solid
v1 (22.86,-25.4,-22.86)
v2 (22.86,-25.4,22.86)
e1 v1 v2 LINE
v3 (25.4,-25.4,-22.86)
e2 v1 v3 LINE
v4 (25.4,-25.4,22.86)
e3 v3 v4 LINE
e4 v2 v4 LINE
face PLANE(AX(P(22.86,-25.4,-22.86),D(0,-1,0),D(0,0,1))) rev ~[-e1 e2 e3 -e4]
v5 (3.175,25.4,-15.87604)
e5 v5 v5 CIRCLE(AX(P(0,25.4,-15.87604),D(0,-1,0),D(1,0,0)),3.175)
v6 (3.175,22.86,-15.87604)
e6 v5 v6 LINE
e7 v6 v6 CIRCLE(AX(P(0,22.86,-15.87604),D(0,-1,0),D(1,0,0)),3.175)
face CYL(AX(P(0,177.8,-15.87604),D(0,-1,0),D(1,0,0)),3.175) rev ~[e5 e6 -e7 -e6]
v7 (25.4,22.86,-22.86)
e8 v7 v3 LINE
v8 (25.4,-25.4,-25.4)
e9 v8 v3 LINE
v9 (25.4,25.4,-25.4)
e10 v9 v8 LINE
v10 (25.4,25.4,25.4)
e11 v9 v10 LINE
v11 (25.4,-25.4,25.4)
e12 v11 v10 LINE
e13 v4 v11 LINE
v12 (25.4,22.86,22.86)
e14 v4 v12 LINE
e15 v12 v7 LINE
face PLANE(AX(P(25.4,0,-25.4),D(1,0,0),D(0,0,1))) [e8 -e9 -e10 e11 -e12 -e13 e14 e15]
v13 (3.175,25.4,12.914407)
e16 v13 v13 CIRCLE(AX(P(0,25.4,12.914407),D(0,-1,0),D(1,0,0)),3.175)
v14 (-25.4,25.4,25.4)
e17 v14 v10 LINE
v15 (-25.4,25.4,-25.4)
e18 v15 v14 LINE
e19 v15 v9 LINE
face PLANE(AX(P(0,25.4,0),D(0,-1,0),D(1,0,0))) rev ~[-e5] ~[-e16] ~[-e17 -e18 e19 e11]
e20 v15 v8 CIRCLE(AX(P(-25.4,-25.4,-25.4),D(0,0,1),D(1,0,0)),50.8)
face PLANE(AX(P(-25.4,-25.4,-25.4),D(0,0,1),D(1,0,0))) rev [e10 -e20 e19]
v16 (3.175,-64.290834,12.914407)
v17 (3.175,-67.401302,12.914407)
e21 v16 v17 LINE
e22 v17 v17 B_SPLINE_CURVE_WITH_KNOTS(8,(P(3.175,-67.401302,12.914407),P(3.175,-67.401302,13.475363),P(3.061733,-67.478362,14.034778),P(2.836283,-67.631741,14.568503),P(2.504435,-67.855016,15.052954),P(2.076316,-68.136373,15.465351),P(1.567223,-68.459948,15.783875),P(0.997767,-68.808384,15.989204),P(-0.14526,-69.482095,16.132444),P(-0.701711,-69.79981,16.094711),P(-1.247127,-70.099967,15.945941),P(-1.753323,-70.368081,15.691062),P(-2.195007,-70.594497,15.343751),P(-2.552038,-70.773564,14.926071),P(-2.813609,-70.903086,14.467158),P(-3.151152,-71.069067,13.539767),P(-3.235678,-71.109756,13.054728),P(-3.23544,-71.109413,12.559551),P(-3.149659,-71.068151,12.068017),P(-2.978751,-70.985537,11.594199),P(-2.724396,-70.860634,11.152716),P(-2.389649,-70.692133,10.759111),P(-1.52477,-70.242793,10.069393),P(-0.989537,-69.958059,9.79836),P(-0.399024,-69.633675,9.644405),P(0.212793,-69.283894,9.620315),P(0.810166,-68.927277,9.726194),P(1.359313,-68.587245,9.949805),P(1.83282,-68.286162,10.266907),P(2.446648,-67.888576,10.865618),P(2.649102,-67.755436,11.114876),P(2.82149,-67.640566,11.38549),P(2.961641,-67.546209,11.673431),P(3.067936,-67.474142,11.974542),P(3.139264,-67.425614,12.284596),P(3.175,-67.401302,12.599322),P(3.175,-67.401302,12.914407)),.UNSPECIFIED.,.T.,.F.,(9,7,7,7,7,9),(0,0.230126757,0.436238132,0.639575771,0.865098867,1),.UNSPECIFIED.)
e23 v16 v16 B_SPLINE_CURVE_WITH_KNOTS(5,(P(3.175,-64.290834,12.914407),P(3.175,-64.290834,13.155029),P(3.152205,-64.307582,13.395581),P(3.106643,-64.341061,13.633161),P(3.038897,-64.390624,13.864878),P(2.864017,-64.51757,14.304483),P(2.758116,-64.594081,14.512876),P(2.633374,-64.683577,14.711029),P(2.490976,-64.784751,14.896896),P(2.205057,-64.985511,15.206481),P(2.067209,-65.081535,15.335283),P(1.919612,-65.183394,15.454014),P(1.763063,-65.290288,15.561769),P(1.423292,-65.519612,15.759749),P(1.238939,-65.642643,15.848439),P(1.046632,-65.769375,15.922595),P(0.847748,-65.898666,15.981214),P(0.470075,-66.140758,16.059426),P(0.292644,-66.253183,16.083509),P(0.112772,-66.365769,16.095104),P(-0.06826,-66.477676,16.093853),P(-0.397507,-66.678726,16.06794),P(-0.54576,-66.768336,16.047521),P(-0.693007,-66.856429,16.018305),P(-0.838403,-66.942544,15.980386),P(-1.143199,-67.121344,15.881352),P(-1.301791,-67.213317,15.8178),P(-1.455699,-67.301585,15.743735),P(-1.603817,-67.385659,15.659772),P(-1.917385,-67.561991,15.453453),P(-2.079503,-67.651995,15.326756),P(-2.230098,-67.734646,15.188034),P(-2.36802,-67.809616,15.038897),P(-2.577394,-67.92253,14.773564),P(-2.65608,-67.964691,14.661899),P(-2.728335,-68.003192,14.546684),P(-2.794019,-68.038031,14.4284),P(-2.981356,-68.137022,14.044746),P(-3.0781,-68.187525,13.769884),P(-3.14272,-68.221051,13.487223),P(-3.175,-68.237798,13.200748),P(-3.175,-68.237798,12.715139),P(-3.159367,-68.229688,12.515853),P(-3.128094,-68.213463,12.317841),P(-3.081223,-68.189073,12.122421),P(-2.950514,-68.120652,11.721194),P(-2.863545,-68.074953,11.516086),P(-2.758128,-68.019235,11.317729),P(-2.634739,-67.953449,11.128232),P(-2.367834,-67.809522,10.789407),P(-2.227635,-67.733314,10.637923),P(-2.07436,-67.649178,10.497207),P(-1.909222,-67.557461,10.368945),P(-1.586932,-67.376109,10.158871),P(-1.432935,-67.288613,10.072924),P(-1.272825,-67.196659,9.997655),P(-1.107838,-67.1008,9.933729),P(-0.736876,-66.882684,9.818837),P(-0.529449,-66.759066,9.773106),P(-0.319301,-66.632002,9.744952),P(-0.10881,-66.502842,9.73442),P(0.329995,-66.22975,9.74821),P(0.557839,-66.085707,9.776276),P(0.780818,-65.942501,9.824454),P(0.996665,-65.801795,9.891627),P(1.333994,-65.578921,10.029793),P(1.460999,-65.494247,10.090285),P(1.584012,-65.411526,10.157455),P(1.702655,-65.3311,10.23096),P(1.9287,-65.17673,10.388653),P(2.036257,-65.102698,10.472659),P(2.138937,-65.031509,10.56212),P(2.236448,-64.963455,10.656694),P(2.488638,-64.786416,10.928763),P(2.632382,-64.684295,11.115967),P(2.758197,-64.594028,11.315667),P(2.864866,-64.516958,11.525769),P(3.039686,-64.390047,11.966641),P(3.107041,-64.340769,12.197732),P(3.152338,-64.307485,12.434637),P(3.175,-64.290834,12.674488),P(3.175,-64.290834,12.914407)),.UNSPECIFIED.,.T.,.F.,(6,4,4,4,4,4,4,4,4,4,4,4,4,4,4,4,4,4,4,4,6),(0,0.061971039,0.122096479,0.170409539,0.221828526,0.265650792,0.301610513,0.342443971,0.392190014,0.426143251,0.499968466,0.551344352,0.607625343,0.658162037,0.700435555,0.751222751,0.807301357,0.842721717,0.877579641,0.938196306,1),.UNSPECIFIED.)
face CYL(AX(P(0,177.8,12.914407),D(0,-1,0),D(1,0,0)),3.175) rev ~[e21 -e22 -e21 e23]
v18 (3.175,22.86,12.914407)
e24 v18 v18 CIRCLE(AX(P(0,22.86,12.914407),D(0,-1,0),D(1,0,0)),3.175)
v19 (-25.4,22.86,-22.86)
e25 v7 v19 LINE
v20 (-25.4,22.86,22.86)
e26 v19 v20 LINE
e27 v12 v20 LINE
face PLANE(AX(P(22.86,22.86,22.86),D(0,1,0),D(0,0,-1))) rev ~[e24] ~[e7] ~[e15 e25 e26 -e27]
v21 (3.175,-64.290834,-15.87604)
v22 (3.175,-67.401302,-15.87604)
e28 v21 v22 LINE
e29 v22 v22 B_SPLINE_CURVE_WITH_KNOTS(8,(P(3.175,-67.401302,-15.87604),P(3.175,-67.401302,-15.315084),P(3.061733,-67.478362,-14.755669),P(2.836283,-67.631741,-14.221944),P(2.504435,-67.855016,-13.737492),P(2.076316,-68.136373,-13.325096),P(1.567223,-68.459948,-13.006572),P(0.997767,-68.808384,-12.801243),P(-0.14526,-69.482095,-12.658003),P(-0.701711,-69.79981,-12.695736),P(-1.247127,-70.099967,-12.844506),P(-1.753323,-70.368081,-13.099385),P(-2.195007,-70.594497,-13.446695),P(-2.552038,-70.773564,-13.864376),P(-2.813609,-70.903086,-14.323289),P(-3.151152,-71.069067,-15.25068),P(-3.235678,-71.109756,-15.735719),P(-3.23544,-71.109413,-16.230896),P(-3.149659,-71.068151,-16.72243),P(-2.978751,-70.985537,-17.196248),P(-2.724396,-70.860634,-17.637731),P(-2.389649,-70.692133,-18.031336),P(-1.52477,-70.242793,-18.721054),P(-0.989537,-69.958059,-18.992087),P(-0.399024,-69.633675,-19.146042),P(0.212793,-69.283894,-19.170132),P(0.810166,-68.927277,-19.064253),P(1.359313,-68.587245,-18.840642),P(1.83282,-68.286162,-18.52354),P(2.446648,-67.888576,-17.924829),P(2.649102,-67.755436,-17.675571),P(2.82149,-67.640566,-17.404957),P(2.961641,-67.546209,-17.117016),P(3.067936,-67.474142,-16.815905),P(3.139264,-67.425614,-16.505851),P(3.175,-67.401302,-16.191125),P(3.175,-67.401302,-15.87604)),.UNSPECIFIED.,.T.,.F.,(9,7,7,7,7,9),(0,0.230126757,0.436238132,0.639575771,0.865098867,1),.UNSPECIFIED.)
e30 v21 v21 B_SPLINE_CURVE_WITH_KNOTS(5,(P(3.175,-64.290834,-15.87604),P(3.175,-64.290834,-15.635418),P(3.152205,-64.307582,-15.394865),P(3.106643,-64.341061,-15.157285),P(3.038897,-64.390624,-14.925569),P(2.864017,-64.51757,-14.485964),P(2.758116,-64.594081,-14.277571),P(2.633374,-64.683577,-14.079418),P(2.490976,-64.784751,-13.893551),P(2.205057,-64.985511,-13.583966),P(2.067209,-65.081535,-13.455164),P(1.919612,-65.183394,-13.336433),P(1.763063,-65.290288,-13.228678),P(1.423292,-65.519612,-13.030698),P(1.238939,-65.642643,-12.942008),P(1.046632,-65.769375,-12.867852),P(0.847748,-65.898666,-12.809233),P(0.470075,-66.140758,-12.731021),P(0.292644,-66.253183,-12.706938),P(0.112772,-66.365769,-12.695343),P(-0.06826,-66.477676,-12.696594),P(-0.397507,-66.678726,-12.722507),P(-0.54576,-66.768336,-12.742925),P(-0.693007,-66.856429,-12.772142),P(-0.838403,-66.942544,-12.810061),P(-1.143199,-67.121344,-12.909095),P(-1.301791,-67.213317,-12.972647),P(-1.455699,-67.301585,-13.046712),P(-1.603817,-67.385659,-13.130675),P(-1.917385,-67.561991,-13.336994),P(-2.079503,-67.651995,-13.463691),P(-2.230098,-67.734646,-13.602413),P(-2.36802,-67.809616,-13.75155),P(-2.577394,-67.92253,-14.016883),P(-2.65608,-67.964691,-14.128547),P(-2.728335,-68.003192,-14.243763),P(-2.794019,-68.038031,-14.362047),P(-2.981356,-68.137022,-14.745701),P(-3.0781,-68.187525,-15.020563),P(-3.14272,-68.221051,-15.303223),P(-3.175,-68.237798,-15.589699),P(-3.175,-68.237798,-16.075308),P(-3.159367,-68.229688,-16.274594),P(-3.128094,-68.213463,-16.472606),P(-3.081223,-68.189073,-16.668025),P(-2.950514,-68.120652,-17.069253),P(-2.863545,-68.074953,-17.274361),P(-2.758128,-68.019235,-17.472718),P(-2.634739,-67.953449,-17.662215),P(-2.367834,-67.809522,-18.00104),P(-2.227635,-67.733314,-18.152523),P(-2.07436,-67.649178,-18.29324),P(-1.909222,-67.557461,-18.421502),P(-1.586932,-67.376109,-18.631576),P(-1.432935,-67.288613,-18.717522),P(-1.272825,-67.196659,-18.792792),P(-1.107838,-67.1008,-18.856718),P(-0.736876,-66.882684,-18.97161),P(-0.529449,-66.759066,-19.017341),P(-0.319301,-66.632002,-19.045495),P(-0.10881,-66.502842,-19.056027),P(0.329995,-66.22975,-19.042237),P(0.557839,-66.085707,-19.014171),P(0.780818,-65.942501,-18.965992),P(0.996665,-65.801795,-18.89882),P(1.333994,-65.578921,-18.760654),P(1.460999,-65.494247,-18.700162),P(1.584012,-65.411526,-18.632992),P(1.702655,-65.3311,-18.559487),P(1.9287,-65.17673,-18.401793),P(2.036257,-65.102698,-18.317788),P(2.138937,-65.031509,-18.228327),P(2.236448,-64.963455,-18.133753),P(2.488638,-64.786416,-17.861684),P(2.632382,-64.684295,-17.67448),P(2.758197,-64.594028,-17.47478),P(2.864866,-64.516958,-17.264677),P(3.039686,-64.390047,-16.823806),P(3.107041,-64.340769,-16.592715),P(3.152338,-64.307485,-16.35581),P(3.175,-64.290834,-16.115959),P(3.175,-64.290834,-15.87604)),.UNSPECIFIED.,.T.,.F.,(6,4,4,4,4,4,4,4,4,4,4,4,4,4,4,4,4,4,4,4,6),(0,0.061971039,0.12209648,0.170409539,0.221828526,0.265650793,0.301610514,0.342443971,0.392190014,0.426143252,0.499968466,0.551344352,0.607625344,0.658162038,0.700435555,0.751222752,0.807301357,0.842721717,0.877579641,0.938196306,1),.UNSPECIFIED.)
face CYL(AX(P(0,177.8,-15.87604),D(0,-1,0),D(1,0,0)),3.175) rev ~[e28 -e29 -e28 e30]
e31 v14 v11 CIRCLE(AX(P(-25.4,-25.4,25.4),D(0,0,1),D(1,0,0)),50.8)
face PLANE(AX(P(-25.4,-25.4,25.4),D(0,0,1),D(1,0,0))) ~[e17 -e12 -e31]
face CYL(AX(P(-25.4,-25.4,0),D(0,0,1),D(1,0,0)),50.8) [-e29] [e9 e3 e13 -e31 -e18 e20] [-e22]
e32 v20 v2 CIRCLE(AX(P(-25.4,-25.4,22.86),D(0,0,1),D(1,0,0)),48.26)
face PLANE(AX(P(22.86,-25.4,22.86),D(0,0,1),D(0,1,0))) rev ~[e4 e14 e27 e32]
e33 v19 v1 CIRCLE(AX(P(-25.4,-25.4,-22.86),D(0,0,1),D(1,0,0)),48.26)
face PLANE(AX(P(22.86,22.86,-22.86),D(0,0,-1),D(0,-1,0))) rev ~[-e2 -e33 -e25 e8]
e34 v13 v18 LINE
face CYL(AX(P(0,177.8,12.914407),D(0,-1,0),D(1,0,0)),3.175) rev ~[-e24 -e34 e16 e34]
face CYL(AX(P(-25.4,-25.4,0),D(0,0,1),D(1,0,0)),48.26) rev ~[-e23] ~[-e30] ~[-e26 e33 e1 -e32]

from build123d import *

# Parameters (mm, degrees)
F0_W      = 50.8
F0_H      = 50.8
F1_DEPTH  = 25.4
F1_FACE_W = 50.8
F1_FACE_H = 50.8
F3_T      = -2.54
F5_D      = 6.35


# Not quite as in the source:
# - a shell that OpenCascade refuses in one call is made with other operations: the cavity is built on its own and cut out


with BuildPart() as f1:
    # F0 (on Front) → F1 (new body, symmetric)
    with BuildSketch(Plane.XZ):
        Rectangle(F0_W, F0_H)
    extrude(amount=F1_DEPTH, both=True)

    # F1_face (on face) → F2 (revolve)
    with BuildSketch(Plane.XZ.offset(25.4)):
        Rectangle(F1_FACE_W, F1_FACE_H)
    revolve(axis=Axis((-25.4, -25.4, 0), (0, 0, 1)))

    # F3: a shell. OpenCascade refuses it in one call, so the cavity is built on its own and cut out:
    # the body offset inwards by the wall thickness, plus a prism from it out through each open face.
    f3_core = offset(f1.part, amount=F3_T, mode=Mode.PRIVATE)
    f3_exits = [f3_core.faces().sort_by_distance(p)[0] for p in [
        (22.86, -1.27, 0),
    ]]
    add(f3_core, mode=Mode.SUBTRACT)
    extrude(f3_exits, amount=-F3_T, mode=Mode.SUBTRACT)

    # F5 (through all)
    with Locations(Plane(origin=(0, 25.4, 0), x_dir=(-1, 0, 0), z_dir=(0, 1, 0))):
        with Locations((0, 12.914407067), (0, -15.8760398626)):
            Hole(F5_D / 2)


solid = f1.part
